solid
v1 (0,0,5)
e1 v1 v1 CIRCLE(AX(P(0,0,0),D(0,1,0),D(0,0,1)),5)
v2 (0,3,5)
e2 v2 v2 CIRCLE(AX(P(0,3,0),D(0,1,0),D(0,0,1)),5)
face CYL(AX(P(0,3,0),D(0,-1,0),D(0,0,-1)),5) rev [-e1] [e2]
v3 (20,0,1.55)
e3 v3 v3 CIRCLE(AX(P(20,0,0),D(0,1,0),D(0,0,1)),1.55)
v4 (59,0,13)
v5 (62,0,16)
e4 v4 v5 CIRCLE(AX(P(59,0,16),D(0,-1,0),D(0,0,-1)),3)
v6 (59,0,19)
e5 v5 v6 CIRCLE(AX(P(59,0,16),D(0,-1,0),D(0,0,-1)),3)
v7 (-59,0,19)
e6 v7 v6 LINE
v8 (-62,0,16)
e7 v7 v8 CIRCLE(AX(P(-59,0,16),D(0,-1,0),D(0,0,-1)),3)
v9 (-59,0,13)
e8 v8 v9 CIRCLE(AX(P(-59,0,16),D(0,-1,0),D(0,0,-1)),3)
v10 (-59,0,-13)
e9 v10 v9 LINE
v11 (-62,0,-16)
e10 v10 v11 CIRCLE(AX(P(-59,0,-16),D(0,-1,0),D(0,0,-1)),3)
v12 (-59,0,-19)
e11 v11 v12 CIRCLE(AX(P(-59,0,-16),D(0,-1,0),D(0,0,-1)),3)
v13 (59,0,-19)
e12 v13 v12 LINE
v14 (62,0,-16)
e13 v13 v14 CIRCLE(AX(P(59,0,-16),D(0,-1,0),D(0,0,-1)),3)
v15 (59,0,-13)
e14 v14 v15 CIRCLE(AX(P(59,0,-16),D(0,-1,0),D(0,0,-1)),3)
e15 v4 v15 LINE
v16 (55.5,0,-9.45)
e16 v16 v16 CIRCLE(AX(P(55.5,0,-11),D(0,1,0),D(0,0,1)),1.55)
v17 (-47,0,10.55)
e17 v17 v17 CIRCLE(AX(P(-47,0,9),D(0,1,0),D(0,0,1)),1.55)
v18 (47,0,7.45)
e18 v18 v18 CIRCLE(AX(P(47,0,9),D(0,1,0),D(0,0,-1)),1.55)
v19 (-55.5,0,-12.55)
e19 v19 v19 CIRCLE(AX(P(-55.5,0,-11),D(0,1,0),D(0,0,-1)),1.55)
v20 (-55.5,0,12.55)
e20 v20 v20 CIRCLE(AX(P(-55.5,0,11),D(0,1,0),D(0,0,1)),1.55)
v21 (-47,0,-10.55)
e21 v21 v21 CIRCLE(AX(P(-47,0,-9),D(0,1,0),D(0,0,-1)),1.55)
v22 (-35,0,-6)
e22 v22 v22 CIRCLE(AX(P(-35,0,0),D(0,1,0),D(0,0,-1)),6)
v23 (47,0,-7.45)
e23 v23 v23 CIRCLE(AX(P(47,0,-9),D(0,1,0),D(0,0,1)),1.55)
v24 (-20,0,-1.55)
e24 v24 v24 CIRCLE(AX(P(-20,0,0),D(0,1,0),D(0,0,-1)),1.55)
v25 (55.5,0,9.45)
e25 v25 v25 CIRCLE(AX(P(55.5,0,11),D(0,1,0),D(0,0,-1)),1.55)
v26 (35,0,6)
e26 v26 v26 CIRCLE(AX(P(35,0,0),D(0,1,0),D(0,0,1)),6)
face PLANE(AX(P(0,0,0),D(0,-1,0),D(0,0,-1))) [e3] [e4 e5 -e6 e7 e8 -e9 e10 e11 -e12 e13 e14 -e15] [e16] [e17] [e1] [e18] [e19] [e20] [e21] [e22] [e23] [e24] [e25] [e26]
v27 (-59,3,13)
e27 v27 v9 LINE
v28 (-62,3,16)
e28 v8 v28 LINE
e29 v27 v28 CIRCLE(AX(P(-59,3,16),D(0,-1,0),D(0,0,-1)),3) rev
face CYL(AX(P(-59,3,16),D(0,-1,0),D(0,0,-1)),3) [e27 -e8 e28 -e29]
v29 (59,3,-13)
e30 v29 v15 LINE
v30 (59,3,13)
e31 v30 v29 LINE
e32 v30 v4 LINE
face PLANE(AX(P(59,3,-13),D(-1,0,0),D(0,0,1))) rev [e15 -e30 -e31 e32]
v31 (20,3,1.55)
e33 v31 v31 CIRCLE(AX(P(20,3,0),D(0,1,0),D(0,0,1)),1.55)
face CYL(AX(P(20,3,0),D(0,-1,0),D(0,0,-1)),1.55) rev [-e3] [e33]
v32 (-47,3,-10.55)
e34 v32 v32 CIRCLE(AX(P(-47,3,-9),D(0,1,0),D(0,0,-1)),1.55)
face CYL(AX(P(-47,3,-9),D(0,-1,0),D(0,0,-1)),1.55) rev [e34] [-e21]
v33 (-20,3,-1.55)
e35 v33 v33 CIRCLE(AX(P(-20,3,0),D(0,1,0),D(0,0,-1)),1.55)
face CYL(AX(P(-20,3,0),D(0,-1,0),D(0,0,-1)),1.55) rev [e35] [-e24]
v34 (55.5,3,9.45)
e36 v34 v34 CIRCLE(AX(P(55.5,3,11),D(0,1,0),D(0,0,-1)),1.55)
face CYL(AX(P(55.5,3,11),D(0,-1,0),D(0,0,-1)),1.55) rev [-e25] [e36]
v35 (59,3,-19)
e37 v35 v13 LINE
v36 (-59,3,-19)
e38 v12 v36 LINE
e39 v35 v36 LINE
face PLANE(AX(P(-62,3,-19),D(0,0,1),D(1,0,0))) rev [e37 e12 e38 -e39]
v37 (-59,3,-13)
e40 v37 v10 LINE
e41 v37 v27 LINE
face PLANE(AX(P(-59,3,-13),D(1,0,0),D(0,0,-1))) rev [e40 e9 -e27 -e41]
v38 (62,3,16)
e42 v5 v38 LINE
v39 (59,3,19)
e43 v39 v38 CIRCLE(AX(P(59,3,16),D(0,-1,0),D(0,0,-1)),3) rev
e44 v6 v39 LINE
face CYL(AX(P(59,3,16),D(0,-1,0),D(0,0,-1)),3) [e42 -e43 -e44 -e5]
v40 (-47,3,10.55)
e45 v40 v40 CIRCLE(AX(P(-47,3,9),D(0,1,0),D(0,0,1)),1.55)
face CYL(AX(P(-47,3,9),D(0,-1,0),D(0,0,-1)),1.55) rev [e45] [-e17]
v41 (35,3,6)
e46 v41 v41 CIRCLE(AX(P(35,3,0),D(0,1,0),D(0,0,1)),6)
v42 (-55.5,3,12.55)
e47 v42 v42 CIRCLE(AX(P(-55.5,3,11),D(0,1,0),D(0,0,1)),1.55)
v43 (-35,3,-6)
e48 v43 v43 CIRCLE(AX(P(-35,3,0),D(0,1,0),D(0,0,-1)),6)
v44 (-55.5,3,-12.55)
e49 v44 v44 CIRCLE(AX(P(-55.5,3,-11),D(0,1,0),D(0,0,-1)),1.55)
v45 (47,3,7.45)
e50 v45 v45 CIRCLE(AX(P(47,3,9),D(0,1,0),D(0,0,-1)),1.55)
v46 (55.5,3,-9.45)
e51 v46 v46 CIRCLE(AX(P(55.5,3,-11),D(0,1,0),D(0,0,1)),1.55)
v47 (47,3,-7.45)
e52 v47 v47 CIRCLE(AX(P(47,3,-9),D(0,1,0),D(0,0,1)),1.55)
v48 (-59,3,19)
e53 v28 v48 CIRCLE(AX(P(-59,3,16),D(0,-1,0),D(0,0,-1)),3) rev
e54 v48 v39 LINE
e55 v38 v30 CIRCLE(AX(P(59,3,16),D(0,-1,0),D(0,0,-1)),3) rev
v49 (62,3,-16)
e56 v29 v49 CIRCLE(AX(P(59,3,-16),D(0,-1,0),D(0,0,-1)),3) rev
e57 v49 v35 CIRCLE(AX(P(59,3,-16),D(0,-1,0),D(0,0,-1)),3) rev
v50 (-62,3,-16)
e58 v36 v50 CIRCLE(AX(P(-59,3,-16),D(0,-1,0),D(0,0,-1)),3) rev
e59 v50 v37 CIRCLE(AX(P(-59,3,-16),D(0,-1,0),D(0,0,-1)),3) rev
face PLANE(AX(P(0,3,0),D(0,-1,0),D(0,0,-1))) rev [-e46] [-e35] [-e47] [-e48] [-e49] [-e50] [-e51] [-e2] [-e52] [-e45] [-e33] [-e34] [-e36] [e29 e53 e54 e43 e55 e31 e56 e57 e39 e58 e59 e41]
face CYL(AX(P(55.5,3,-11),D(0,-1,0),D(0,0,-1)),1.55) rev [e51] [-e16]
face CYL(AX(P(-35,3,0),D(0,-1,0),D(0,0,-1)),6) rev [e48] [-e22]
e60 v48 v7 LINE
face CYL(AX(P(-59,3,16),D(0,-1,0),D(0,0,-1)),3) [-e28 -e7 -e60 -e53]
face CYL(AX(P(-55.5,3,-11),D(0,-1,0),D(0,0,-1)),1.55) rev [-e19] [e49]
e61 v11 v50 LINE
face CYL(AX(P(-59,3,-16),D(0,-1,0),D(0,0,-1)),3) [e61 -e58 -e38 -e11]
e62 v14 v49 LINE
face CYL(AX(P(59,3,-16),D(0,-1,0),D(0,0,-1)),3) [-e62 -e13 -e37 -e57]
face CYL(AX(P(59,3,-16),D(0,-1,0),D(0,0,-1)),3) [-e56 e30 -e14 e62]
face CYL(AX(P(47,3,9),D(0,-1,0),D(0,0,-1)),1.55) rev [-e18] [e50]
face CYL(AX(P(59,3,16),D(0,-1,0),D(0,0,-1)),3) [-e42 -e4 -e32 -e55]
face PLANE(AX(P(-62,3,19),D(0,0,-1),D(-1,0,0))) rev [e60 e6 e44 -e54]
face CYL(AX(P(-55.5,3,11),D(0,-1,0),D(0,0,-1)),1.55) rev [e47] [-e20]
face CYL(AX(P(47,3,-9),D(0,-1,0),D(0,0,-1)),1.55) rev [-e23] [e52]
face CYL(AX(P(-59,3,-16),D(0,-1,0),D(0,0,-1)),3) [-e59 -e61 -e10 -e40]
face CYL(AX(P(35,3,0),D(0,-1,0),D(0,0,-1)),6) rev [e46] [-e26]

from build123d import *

# Parameters (mm, degrees)
SKETCH1_R           = 1.55
SKETCH1_R_2         = 5
SKETCH1_R_3         = 6
BOSS_EXTRUDE1_DEPTH = 3
FILLET1_R           = 3


with BuildPart() as part:
    # Sketch1 → Boss-Extrude1 (new body)
    with BuildSketch(Plane(origin=(0, 0, 0), x_dir=(1, 0, 0), z_dir=(0, 1, 0))):
        Polygon((-62, 19), (62, 19), (62, 13), (59, 13), (59, -13), (62, -13), (62, -19), (-62, -19), (-62, -13), (-59, -13), (-59, 13), (-62, 13), align=None)
        with Locations(Location((55.5, 11, 0), (0, 0, 270))):
            Circle(SKETCH1_R, mode=Mode.SUBTRACT)
        with Locations(Location((-55.5, 11, 0), (0, 0, 90))):
            Circle(SKETCH1_R, mode=Mode.SUBTRACT)
        with Locations(Location((-55.5, -11, 0), (0, 0, 270))):
            Circle(SKETCH1_R, mode=Mode.SUBTRACT)
        with Locations(Location((55.5, -11, 0), (0, 0, 90))):
            Circle(SKETCH1_R, mode=Mode.SUBTRACT)
        with Locations(Location((0, 0, 0), (0, 0, 270))):
            Circle(SKETCH1_R_2, mode=Mode.SUBTRACT)
        with Locations(Location((20, 0, 0), (0, 0, 270))):
            Circle(SKETCH1_R, mode=Mode.SUBTRACT)
        with Locations(Location((-20, 0, 0), (0, 0, 90))):
            Circle(SKETCH1_R, mode=Mode.SUBTRACT)
        with Locations(Location((35, 0, 0), (0, 0, 270))):
            Circle(SKETCH1_R_3, mode=Mode.SUBTRACT)
        with Locations(Location((-35, 0, 0), (0, 0, 90))):
            Circle(SKETCH1_R_3, mode=Mode.SUBTRACT)
        with Locations(Location((47, 9, 0), (0, 0, 270))):
            Circle(SKETCH1_R, mode=Mode.SUBTRACT)
        with Locations(Location((47, -9, 0), (0, 0, 90))):
            Circle(SKETCH1_R, mode=Mode.SUBTRACT)
        with Locations(Location((-47, -9, 0), (0, 0, 270))):
            Circle(SKETCH1_R, mode=Mode.SUBTRACT)
        with Locations(Location((-47, 9, 0), (0, 0, 90))):
            Circle(SKETCH1_R, mode=Mode.SUBTRACT)
    extrude(amount=BOSS_EXTRUDE1_DEPTH)

    # Fillet1
    fillet1_edges = [part.edges().sort_by_distance(p)[0] for p in [
        (-62, 1.5, -19),
        (-62, 1.5, -13),
        (-62, 1.5, 13),
        (-62, 1.5, 19),
        (62, 1.5, 19),
        (62, 1.5, 13),
        (62, 1.5, -13),
        (62, 1.5, -19),
    ]]
    fillet(fillet1_edges, radius=FILLET1_R - 0.0001)  # a hair under: the kernel refuses the full size


solid = part.part
